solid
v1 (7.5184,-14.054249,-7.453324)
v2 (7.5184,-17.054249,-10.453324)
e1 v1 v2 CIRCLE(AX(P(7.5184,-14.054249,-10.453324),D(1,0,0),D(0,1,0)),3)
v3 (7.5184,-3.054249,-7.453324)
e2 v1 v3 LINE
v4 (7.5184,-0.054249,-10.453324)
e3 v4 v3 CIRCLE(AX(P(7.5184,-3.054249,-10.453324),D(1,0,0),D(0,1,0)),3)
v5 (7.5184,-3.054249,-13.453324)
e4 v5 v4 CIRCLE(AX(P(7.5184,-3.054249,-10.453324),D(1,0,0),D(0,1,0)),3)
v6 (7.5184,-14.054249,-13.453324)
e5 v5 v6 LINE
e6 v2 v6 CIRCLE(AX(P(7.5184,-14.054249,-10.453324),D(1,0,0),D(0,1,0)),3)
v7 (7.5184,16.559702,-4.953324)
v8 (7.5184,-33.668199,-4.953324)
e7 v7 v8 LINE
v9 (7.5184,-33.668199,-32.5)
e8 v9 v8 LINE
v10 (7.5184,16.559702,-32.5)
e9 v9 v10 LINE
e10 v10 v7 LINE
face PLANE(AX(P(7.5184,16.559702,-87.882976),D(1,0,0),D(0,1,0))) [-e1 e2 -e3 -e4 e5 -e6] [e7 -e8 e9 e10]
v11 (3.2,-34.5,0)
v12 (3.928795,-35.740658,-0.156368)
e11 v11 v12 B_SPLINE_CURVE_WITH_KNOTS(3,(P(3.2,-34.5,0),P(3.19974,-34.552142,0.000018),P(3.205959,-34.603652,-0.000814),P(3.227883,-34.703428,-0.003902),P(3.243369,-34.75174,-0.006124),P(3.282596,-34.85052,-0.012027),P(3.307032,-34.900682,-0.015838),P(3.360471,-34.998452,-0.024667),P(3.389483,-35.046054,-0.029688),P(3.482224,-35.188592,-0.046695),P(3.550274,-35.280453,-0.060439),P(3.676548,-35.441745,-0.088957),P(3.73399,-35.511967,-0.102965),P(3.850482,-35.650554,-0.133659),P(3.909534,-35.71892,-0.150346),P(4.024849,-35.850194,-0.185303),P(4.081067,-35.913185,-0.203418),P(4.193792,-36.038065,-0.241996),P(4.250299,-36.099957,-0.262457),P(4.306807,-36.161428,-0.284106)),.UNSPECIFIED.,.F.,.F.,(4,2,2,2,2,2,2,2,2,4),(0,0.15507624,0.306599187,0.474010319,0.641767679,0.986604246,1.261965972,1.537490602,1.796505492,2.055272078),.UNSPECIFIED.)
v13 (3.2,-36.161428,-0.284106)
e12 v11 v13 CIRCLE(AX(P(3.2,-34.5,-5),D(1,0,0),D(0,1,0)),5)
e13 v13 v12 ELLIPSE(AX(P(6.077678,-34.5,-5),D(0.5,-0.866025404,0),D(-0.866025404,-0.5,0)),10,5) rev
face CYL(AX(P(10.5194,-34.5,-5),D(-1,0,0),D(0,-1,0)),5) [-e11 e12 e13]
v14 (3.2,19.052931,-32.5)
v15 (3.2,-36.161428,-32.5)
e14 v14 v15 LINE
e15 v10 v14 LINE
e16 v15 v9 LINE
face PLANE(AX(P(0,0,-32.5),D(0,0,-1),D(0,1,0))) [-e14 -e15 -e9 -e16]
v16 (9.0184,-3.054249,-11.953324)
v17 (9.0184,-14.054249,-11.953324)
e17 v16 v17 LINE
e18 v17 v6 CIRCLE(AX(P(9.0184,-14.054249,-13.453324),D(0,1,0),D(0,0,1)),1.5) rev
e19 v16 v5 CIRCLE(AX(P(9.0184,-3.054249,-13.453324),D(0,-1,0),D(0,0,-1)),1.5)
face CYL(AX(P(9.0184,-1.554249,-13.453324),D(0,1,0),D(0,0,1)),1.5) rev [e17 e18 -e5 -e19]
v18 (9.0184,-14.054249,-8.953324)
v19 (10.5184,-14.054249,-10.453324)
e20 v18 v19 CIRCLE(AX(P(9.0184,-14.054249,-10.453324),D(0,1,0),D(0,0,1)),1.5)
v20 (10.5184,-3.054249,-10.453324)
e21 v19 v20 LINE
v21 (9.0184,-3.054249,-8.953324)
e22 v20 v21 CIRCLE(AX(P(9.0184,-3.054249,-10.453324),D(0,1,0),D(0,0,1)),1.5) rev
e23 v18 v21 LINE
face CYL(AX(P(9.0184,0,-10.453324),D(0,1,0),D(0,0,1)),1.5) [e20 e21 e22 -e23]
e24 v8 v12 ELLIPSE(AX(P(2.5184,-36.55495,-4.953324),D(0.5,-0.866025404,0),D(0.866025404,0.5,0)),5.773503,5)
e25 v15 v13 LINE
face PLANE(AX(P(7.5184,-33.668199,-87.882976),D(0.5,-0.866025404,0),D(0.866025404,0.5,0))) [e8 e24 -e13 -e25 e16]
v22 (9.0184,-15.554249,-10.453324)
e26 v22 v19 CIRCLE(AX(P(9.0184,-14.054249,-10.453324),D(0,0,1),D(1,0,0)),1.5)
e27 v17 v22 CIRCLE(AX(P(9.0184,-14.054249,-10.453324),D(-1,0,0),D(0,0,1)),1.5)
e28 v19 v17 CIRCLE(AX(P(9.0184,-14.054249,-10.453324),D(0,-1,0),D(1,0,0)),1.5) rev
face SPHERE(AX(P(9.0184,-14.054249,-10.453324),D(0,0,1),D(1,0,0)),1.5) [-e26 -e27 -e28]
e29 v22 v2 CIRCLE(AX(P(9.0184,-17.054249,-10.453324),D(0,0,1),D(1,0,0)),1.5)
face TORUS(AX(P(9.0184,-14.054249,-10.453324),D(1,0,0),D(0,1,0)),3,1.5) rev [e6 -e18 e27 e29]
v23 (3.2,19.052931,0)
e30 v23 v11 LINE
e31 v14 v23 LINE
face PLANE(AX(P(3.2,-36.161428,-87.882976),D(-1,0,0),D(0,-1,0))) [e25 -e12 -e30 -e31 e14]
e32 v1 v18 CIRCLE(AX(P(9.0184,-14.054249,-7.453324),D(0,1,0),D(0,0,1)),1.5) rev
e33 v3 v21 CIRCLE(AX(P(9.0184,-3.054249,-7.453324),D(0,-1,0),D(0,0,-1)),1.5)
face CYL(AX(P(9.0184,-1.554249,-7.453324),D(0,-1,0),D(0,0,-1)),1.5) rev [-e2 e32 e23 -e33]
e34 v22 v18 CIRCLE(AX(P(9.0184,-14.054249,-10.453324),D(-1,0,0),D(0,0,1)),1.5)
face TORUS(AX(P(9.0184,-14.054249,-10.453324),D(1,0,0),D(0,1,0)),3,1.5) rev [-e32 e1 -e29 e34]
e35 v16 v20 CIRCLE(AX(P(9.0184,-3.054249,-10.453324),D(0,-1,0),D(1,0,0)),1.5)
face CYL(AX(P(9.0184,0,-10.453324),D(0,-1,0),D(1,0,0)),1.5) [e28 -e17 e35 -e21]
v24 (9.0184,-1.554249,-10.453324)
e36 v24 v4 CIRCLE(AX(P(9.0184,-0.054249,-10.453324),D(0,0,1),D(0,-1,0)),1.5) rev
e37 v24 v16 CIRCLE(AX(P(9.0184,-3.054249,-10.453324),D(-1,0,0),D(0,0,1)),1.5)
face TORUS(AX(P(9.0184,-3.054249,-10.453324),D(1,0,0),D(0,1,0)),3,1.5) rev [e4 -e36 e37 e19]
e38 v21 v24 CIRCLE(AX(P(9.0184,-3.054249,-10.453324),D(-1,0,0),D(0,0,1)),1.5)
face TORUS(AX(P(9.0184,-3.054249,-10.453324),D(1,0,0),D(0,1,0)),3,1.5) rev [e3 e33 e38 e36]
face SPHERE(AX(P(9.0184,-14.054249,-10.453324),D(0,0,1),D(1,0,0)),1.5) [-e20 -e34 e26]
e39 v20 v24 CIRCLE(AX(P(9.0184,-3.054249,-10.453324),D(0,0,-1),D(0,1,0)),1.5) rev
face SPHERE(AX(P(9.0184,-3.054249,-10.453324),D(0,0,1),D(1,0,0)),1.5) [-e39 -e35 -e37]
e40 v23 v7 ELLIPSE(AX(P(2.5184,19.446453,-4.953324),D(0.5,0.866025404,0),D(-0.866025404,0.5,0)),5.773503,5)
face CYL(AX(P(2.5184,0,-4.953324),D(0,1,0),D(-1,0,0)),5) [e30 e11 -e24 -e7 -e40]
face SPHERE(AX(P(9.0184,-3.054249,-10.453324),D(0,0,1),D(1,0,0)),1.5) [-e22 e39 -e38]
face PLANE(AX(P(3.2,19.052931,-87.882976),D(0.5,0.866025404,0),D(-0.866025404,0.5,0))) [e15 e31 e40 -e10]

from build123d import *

# Parameters (mm, degrees)
BOSS_EXTRUDE1_DEPTH = 32.5
FILLET1_R           = 5
BOSS_EXTRUDE2_DEPTH = 3
FILLET2_R           = 1.5
FILLET3_R           = 1.5
CUT_EXTRUDE1_REACH  = 51.168


# Some blends are built 0.0001 mm under size
with BuildPart() as part:
    # Sketch1 → Boss-Extrude1 (new body)
    with BuildSketch(Plane.XY):
        Polygon((7.518400000000005, 16.559701585568554), (7.518400000000011, -33.66819896343934), (3.199999999999987, -36.16142836590783), (3.1999999999999793, 19.05293098803705), align=None)
    extrude(amount=-BOSS_EXTRUDE1_DEPTH)

    # Fillet1
    # the kernel refuses this fillet: 5 mm, written as the material it takes off along each edge
    with BuildSketch(Plane(origin=(7.518400000000003, 28.94301228989969, 0), x_dir=(0, 0, -1), z_dir=(1.2e-16, -1, 0))) as fillet1_piece_1:
        with BuildLine():
            CenterArc((4.953324281732454, -5), FILLET1_R, 90, 82.16504398350045)
            Line((2.931e-14, -4.318400000000029), (-0.09906648563461919, -4.3047680000000295))
            ThreePointArc((-0.09906648563461919, -4.3047680000000295), (-0.1, -2.1592000000000144), (-0.1, 0))
            Line((-0.1, 0), (0, 0.09999999999999964))
            Line((0, 0.09999999999999964), (4.953324281732454, 0.09999999999999964))
            Line((4.953324281732454, 0.09999999999999964), (4.953324281732454, 0))
        make_face()
    extrude(amount=74.99452195767016, mode=Mode.SUBTRACT)

    # Sketch3 → Boss-Extrude2 (add)
    with BuildSketch(Plane(origin=(7.518400000000007, 9.1e-16, 0), x_dir=(0, 0, -1), z_dir=(1, 1.2e-16, 0))):
        Polygon((8.953324281732419, -1.5542486889353926), (11.953324281732419, -1.554248688935389), (11.95332428173242, -15.55424868893539), (8.95332428173242, -15.55424868893539), align=None)
    extrude(amount=BOSS_EXTRUDE2_DEPTH)

    # Fillet2
    fillet2_edges = [part.edges().sort_by_distance(p)[0] for p in [
        (10.518400000000009, -8.55424868893539, -8.95332428173242),
        (10.518400000000009, -15.554248688935388, -10.45332428173242),
        (10.518400000000009, -8.554248688935386, -11.95332428173242),
        (10.518400000000007, -1.5542486889353895, -10.453324281732419),
    ]]
    fillet(fillet2_edges, radius=FILLET2_R - 0.0001)  # a hair under: the kernel refuses the full size

    # Fillet3
    # the kernel refuses this fillet: 1.5 mm, written as the material it takes off along each edge
    with BuildSketch(Plane(origin=(10.518400000000009, -14.05424868893539, -10.45332428173242), x_dir=(1.2e-16, -1, 0), z_dir=(0, 0, 1))) as fillet3_piece_1:
        with BuildLine():
            CenterArc((9.999999999999e-05, -1.4999), 1.4999, 0, 90)
            Line((1.5, -1.4999), (1.5, 0))
            Line((1.5, 0), (9.999999999999e-05, 0))
        make_face()
    revolve(axis=Axis((10.518400000000009, -14.05424868893539, -10.45332428173242), (1, 1.2e-16, 0)), revolution_arc=90.00000000000001, mode=Mode.SUBTRACT)
    with BuildSketch(Plane(origin=(10.518400000000009, -14.054248688935388, -10.45332428173242), x_dir=(0, -1.3e-16, 1), z_dir=(-1.2e-16, 1, 1.3e-16))) as fillet3_piece_2:
        with BuildLine():
            CenterArc((9.999999999999e-05, -1.4999), 1.4999, 0, 90)
            Line((1.5, -1.4999), (1.5, 0))
            Line((1.5, 0), (9.999999999999e-05, 0))
        make_face()
    revolve(axis=Axis((10.518400000000009, -14.054248688935388, -10.45332428173242), (1, 1.2e-16, 0)), revolution_arc=90, mode=Mode.SUBTRACT)
    with BuildSketch(Plane(origin=(10.518400000000009, -3.05424868893539, -10.453324281732419), x_dir=(0, 1.3e-16, -1), z_dir=(1.2e-16, -1, -1.3e-16))) as fillet3_piece_3:
        with BuildLine():
            CenterArc((9.999999999999e-05, -1.4999), 1.4999, 0, 90)
            Line((1.5, -1.4999), (1.5, 0))
            Line((1.5, 0), (9.999999999999e-05, 0))
        make_face()
    revolve(axis=Axis((10.518400000000009, -3.05424868893539, -10.453324281732419), (1, 1.2e-16, 0)), revolution_arc=90.00000000000006, mode=Mode.SUBTRACT)
    with BuildSketch(Plane(origin=(10.518400000000009, -3.05424868893539, -10.453324281732419), x_dir=(-1.2e-16, 1, 1.18e-15), z_dir=(0, 1.18e-15, -1))) as fillet3_piece_4:
        with BuildLine():
            CenterArc((9.999999999999e-05, -1.4999), 1.4999, 0, 90)
            Line((1.5, -1.4999), (1.5, 0))
            Line((1.5, 0), (9.999999999999e-05, 0))
        make_face()
    revolve(axis=Axis((10.518400000000009, -3.05424868893539, -10.453324281732419), (1, 1.2e-16, 0)), revolution_arc=89.99999999999994, mode=Mode.SUBTRACT)
    with BuildSketch(Plane(origin=(7.518400000000007, -1.5542486889353917, -8.953324281732419), x_dir=(0, 1.18e-15, -1), z_dir=(1, 1.2e-16, 0))) as fillet3_piece_5:
        with BuildLine():
            CenterArc((FILLET3_R, -FILLET3_R), FILLET3_R, 90, 89.99999999999986)
            Line((-1.78e-15, -FILLET3_R), (-FILLET3_R * 0.02, -FILLET3_R))
            Line((-FILLET3_R * 0.02, -FILLET3_R), (-FILLET3_R * 0.02, FILLET3_R * 0.02))
            Line((-FILLET3_R * 0.02, FILLET3_R * 0.02), (FILLET3_R, FILLET3_R * 0.02))
            Line((FILLET3_R, FILLET3_R * 0.02), (FILLET3_R, 0))
        make_face()
    extrude(amount=3, mode=Mode.SUBTRACT)
    with BuildSketch(Plane(origin=(7.518400000000007, -1.5542486889353881, -11.953324281732419), x_dir=(0, -1.18e-15, 1), z_dir=(1, 1.2e-16, 0))) as fillet3_piece_6:
        with BuildLine():
            CenterArc((FILLET3_R, FILLET3_R), FILLET3_R, 179.99999999999994, 90.00000000000006)
            Line((1.78e-15, FILLET3_R), (-FILLET3_R * 0.02, FILLET3_R))
            Line((-FILLET3_R * 0.02, FILLET3_R), (-FILLET3_R * 0.02, -FILLET3_R * 0.02))
            Line((-FILLET3_R * 0.02, -FILLET3_R * 0.02), (FILLET3_R, -FILLET3_R * 0.02))
            Line((FILLET3_R, -FILLET3_R * 0.02), (FILLET3_R, 0))
        make_face()
    extrude(amount=3, mode=Mode.SUBTRACT)
    with BuildSketch(Plane(origin=(7.518400000000009, -15.554248688935388, -11.95332428173242), x_dir=(-1.2e-16, 1, 0), z_dir=(1, 1.2e-16, 0))) as fillet3_piece_7:
        with BuildLine():
            CenterArc((FILLET3_R, FILLET3_R), FILLET3_R, 180, 90)
            Line((-1.78e-15, FILLET3_R), (-FILLET3_R * 0.02, FILLET3_R))
            Line((-FILLET3_R * 0.02, FILLET3_R), (-FILLET3_R * 0.02, -FILLET3_R * 0.02))
            Line((-FILLET3_R * 0.02, -FILLET3_R * 0.02), (FILLET3_R, -FILLET3_R * 0.02))
            Line((FILLET3_R, -FILLET3_R * 0.02), (FILLET3_R, 0))
        make_face()
    extrude(amount=3, mode=Mode.SUBTRACT)
    with BuildSketch(Plane(origin=(7.518400000000009, -15.554248688935388, -8.95332428173242), x_dir=(-1.2e-16, 1, 0), z_dir=(1, 1.2e-16, 0))) as fillet3_piece_8:
        with BuildLine():
            CenterArc((FILLET3_R, -FILLET3_R), FILLET3_R, 90, 90)
            Line((0, -FILLET3_R), (-FILLET3_R * 0.02, -FILLET3_R))
            Line((-FILLET3_R * 0.02, -FILLET3_R), (-FILLET3_R * 0.02, FILLET3_R * 0.02))
            Line((-FILLET3_R * 0.02, FILLET3_R * 0.02), (FILLET3_R, FILLET3_R * 0.02))
            Line((FILLET3_R, FILLET3_R * 0.02), (FILLET3_R, 0))
        make_face()
    extrude(amount=3, mode=Mode.SUBTRACT)
    fillet3_2_edges = [part.edges().sort_by_distance(p)[0] for p in [
        (7.518400000000008, -8.554248688935388, -8.953324281732419),
        (7.518400000000008, -8.55424868893539, -11.95332428173242),
    ]]
    fillet(fillet3_2_edges, radius=FILLET3_R)

    # Sketch4 → Cut-Extrude1 (cut, up to next)
    with BuildSketch(Plane.ZY.offset(-3.199999999999982), mode=Mode.PRIVATE) as cut_extrude1_sk1:
        with BuildLine():
            Line((-0.28410604604419637, -36.161428365907824), (0, -36.16142836590783))
            Line((0, -36.16142836590783), (6.94e-15, -34.499999999999986))
            ThreePointArc((6.94e-15, -34.499999999999986), (-0.07153828412053453, -35.34277227951001), (-0.28410604604419637, -36.161428365907824))
        make_face()
    cut_extrude1_tool1 = extrude(cut_extrude1_sk1.sketch, amount=-CUT_EXTRUDE1_REACH, mode=Mode.PRIVATE) & part.part
    add(cut_extrude1_tool1.solids().sort_by_distance((3.2, -35.748468, -0.0848))[0], mode=Mode.SUBTRACT)


solid = part.part
